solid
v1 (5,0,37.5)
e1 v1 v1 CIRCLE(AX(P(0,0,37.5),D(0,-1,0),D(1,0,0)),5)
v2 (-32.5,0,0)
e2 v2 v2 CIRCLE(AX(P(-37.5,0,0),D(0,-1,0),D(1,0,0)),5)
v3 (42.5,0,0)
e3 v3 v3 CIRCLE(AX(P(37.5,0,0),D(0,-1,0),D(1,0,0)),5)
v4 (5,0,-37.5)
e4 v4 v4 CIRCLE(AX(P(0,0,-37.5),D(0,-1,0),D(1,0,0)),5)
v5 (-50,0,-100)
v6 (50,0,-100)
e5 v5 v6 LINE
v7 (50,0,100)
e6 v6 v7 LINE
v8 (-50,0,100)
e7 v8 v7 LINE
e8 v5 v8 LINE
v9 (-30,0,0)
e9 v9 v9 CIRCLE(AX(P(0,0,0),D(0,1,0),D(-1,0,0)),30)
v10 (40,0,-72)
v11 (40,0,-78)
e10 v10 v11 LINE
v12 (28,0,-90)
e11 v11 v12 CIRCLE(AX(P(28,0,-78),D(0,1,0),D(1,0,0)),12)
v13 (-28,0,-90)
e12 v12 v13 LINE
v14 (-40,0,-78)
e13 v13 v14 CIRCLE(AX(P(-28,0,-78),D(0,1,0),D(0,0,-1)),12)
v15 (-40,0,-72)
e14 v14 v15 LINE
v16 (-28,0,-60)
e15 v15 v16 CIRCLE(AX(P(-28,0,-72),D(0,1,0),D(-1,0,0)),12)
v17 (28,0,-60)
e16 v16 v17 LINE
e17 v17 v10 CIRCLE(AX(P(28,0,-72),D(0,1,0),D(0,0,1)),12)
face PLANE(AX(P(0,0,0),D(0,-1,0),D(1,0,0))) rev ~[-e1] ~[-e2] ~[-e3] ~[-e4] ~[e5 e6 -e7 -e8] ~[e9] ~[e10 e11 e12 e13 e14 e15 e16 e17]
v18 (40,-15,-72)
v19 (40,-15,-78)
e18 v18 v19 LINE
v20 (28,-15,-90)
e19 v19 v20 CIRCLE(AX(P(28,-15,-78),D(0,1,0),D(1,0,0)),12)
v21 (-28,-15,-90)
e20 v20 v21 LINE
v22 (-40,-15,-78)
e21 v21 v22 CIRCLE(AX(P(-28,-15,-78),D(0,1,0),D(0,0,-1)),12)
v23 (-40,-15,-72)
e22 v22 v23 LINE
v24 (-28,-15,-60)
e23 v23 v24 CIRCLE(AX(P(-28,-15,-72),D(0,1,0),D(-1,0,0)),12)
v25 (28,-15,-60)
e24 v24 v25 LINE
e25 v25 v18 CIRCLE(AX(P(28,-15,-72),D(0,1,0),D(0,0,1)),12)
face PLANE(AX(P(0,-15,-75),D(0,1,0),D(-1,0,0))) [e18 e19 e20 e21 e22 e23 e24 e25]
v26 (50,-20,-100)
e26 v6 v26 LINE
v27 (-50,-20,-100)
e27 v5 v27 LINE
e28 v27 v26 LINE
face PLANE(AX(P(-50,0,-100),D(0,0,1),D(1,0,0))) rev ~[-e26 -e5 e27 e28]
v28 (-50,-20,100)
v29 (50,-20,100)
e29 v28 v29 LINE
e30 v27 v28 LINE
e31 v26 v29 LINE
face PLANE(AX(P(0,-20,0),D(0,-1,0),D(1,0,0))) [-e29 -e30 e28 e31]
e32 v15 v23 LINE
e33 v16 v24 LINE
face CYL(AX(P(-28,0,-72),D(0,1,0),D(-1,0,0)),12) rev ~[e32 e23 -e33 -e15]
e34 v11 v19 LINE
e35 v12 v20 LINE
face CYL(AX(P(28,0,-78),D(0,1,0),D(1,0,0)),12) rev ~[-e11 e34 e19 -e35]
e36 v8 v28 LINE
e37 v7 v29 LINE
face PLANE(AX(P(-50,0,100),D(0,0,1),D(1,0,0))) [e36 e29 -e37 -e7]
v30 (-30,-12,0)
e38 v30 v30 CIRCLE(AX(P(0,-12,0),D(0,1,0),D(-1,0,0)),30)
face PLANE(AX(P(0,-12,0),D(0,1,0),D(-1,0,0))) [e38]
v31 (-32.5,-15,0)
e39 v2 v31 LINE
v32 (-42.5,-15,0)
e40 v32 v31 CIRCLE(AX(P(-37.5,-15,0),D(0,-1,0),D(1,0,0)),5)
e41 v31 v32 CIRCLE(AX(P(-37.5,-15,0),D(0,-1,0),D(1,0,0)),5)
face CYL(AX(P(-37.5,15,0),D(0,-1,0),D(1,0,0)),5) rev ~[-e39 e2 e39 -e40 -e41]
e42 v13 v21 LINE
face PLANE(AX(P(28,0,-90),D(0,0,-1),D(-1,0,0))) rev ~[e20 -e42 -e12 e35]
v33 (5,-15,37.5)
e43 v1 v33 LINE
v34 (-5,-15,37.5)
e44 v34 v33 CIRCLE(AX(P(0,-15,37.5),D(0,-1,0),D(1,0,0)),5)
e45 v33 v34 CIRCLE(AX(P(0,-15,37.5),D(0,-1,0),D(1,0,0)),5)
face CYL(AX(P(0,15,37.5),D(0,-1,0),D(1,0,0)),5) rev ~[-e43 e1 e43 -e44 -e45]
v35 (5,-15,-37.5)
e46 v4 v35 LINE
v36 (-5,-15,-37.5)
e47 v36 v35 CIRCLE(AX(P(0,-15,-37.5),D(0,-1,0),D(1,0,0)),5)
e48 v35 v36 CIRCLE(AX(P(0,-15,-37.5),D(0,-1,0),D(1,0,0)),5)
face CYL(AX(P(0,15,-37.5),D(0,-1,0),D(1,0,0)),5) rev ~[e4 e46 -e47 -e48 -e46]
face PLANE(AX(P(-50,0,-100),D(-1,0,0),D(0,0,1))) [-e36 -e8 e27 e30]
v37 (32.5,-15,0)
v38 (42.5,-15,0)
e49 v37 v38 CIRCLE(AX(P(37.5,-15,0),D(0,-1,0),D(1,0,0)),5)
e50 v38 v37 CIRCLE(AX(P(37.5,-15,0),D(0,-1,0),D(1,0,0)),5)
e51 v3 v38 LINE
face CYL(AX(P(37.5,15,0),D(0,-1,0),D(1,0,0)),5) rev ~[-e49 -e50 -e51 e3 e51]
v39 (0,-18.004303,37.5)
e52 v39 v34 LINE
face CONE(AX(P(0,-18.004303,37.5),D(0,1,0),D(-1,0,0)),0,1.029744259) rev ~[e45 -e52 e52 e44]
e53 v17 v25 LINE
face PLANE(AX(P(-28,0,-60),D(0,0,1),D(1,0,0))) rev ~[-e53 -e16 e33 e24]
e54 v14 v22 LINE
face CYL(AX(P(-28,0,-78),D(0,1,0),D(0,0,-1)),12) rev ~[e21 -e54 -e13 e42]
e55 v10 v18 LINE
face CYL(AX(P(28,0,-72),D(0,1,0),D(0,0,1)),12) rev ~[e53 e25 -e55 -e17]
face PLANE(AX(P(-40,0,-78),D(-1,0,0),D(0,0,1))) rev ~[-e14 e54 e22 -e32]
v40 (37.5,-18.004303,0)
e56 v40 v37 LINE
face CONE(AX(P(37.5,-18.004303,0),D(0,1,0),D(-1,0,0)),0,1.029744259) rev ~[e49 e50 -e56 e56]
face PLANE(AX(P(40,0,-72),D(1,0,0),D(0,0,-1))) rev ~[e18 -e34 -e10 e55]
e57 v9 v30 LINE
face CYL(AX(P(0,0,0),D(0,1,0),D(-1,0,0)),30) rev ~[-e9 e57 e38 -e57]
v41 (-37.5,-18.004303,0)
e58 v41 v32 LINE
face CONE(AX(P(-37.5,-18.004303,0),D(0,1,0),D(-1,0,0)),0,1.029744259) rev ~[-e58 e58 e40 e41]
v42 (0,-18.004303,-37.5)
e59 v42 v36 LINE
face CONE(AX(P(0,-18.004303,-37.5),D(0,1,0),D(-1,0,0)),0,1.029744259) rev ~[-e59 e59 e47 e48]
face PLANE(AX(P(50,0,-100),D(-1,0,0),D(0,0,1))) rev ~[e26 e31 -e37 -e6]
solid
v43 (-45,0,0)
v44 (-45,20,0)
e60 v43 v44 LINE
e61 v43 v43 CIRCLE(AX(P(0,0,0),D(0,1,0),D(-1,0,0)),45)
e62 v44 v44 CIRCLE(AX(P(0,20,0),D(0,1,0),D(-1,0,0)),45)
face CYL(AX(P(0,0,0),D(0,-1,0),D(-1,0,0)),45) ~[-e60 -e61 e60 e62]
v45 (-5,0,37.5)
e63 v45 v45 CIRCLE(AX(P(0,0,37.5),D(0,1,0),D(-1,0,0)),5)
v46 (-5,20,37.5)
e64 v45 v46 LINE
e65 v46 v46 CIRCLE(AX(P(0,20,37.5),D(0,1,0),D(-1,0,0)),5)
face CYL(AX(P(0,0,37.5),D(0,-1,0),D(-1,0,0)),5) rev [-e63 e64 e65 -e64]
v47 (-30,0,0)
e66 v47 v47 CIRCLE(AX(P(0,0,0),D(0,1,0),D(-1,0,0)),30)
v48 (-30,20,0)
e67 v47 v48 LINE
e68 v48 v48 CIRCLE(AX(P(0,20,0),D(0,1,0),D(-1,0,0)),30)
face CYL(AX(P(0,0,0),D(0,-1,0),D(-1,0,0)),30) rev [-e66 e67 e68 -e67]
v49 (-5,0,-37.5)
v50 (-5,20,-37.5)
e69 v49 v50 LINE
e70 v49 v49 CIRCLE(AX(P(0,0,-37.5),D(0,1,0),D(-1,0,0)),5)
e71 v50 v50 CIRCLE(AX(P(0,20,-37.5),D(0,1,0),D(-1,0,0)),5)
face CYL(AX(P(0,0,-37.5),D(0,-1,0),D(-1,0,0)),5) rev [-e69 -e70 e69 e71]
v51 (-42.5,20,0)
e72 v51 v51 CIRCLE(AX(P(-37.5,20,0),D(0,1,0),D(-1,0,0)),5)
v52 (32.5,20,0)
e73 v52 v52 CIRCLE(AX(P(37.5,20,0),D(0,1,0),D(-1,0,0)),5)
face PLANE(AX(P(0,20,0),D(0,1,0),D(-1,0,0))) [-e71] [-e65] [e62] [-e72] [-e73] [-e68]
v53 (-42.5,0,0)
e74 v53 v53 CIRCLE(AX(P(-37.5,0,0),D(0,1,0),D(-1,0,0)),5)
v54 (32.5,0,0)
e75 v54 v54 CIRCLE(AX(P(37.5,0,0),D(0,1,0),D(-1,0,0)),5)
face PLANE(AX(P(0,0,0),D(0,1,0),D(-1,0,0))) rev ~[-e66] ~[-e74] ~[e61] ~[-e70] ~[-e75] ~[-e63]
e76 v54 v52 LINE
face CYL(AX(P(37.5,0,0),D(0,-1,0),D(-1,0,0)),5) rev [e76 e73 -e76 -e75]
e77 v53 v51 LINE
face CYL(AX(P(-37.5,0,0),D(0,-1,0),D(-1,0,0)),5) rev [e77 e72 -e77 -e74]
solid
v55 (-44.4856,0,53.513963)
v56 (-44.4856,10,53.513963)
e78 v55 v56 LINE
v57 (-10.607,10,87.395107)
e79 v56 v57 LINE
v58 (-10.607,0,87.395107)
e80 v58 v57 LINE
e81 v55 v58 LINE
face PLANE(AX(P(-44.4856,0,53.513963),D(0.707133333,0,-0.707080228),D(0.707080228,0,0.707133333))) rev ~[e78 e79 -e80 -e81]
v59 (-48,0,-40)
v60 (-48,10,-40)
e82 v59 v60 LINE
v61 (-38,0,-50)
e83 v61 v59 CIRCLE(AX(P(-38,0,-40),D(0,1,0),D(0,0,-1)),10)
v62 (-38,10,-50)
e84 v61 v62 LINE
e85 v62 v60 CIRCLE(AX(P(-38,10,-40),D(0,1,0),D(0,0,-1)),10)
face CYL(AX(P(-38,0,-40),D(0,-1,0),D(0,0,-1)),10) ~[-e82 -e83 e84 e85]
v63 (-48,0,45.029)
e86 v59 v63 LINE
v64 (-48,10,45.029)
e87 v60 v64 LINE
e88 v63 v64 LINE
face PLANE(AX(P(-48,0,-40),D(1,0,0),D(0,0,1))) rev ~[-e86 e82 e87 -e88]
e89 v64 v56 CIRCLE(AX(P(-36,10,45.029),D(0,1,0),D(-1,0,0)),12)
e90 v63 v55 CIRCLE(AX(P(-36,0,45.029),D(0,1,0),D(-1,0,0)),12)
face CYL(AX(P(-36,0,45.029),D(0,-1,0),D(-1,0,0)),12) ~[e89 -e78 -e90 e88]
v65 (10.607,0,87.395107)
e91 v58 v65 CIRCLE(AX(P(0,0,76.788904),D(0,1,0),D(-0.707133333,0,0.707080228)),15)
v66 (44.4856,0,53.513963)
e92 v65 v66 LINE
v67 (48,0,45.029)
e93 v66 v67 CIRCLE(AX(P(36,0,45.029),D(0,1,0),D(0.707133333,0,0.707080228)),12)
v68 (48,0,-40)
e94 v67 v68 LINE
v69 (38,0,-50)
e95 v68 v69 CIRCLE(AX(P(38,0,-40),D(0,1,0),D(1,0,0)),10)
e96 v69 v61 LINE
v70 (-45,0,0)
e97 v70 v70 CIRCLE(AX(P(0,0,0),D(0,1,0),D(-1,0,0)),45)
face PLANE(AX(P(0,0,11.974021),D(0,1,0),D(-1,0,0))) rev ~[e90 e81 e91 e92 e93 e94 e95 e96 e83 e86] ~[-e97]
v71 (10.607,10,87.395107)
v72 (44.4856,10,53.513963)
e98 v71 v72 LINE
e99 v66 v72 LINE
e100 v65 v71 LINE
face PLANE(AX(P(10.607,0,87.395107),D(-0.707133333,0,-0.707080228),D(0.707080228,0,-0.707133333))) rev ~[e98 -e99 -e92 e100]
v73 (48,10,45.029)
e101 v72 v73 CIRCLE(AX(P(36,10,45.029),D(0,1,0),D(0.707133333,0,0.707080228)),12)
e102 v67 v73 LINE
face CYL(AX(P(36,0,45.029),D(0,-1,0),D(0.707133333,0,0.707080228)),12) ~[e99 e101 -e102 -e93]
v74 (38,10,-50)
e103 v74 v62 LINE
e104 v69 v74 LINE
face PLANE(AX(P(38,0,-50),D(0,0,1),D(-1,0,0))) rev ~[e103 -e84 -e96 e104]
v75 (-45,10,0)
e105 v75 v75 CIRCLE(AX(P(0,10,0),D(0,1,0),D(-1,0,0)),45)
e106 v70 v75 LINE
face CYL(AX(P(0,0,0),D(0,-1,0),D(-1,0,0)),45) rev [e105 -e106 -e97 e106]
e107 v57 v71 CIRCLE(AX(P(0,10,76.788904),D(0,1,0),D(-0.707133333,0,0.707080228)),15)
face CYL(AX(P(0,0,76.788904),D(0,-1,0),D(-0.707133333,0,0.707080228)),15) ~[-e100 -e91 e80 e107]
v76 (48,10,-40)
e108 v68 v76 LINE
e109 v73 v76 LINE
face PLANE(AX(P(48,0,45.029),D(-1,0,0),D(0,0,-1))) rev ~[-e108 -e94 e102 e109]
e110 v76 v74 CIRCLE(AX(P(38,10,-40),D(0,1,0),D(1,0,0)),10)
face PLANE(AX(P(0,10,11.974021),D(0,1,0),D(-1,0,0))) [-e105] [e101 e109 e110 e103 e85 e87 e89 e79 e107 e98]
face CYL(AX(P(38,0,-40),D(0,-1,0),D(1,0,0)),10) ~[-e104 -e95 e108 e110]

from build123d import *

# Parameters (mm, degrees)
F0_W     = 100
F0_H     = 200
F1_DEPTH = 20
F3_DEPTH = 15
F2_R     = 45
F4_DEPTH = 10
F2_R_2   = 5
F2_R_3   = 30
F5_DEPTH = 20
F6_D     = 10
F6_DEPTH = 15
F6_TIP   = 3.0043030951
F7_DEPTH = 12


with BuildPart() as f1:
    # F0 (on Front) → F1 (new body)
    with BuildSketch(Plane.XZ):
        Rectangle(F0_W, F0_H)
    extrude(amount=F1_DEPTH)

    # F2 (on face) → F3 (cut)
    with BuildSketch(Plane(origin=(0, 0, 0), x_dir=(-1, 0, 0), z_dir=(0, 1, 0))):
        with BuildLine():
            ThreePointArc((-40, -78), (-36.4852813742, -86.4852813742), (-28, -90))
            Line((-28, -90), (28, -90))
            ThreePointArc((28, -90), (36.4852813742, -86.4852813742), (40, -78))
            Line((40, -78), (40, -72))
            ThreePointArc((40, -72), (36.4852813742, -63.5147186258), (28, -60))
            Line((28, -60), (-28, -60))
            ThreePointArc((-28, -60), (-36.4852813742, -63.5147186258), (-40, -72))
            Line((-40, -72), (-40, -78))
        make_face()
    extrude(amount=-F3_DEPTH, mode=Mode.SUBTRACT)

    # F6
    with Locations(Plane(origin=(0, 0, 0), x_dir=(-1, 0, 0), z_dir=(0, 1, 0))):
        with Locations((-37.5, 0), (0, -37.5), (37.5, 0), (0, 37.5)):
            Hole(F6_D / 2, depth=F6_DEPTH)
            with Locations((0, 0, -(F6_DEPTH + F6_TIP / 2))):  # 118° drill point
                Cone(0, F6_D / 2, F6_TIP, mode=Mode.SUBTRACT)

    # F2 (on face) → F7 (cut)
    with BuildSketch(Plane(origin=(0, 0, 0), x_dir=(-1, 0, 0), z_dir=(0, 1, 0))):
        Circle(F2_R_3)
    extrude(amount=-F7_DEPTH, mode=Mode.SUBTRACT)


with BuildPart() as f4:
    # F2 (on face) → F4 (new body)
    with BuildSketch(Plane(origin=(0, 0, 0), x_dir=(-1, 0, 0), z_dir=(0, 1, 0))):
        with BuildLine():
            ThreePointArc((-48, -40), (-45.0710678119, -47.0710678119), (-38, -50))
            Line((-38, -50), (38, -50))
            ThreePointArc((38, -50), (45.0710678119, -47.0710678119), (48, -40))
            Line((48, -40), (48, 45.029))
            ThreePointArc((48, 45.029), (47.0866406093, 49.6209930314), (44.4856, 53.5139627365))
            Line((44.4856, 53.5139627365), (10.607, 87.3951071902))
            ThreePointArc((10.607, 87.3951071902), (0, 91.7889037696), (-10.607, 87.3951071902))
            Line((-10.607, 87.3951071902), (-44.4856, 53.5139627365))
            ThreePointArc((-44.4856, 53.5139627365), (-47.0866406093, 49.6209930314), (-48, 45.029))
            Line((-48, 45.029), (-48, -40))
        make_face()
        Circle(F2_R, mode=Mode.SUBTRACT)
    extrude(amount=F4_DEPTH)


with BuildPart() as f5:
    # F2 (on face) → F5 (new body)
    with BuildSketch(Plane(origin=(0, 0, 0), x_dir=(-1, 0, 0), z_dir=(0, 1, 0))):
        Circle(F2_R)
        with Locations((0, -37.5)):
            Circle(F2_R_2, mode=Mode.SUBTRACT)
        with Locations((-37.5, 0)):
            Circle(F2_R_2, mode=Mode.SUBTRACT)
        Circle(F2_R_3, mode=Mode.SUBTRACT)
        with Locations((0, 37.5)):
            Circle(F2_R_2, mode=Mode.SUBTRACT)
        with Locations((37.5, 0)):
            Circle(F2_R_2, mode=Mode.SUBTRACT)
    extrude(amount=F5_DEPTH)


solid = Compound([f1.part, f4.part, f5.part])
